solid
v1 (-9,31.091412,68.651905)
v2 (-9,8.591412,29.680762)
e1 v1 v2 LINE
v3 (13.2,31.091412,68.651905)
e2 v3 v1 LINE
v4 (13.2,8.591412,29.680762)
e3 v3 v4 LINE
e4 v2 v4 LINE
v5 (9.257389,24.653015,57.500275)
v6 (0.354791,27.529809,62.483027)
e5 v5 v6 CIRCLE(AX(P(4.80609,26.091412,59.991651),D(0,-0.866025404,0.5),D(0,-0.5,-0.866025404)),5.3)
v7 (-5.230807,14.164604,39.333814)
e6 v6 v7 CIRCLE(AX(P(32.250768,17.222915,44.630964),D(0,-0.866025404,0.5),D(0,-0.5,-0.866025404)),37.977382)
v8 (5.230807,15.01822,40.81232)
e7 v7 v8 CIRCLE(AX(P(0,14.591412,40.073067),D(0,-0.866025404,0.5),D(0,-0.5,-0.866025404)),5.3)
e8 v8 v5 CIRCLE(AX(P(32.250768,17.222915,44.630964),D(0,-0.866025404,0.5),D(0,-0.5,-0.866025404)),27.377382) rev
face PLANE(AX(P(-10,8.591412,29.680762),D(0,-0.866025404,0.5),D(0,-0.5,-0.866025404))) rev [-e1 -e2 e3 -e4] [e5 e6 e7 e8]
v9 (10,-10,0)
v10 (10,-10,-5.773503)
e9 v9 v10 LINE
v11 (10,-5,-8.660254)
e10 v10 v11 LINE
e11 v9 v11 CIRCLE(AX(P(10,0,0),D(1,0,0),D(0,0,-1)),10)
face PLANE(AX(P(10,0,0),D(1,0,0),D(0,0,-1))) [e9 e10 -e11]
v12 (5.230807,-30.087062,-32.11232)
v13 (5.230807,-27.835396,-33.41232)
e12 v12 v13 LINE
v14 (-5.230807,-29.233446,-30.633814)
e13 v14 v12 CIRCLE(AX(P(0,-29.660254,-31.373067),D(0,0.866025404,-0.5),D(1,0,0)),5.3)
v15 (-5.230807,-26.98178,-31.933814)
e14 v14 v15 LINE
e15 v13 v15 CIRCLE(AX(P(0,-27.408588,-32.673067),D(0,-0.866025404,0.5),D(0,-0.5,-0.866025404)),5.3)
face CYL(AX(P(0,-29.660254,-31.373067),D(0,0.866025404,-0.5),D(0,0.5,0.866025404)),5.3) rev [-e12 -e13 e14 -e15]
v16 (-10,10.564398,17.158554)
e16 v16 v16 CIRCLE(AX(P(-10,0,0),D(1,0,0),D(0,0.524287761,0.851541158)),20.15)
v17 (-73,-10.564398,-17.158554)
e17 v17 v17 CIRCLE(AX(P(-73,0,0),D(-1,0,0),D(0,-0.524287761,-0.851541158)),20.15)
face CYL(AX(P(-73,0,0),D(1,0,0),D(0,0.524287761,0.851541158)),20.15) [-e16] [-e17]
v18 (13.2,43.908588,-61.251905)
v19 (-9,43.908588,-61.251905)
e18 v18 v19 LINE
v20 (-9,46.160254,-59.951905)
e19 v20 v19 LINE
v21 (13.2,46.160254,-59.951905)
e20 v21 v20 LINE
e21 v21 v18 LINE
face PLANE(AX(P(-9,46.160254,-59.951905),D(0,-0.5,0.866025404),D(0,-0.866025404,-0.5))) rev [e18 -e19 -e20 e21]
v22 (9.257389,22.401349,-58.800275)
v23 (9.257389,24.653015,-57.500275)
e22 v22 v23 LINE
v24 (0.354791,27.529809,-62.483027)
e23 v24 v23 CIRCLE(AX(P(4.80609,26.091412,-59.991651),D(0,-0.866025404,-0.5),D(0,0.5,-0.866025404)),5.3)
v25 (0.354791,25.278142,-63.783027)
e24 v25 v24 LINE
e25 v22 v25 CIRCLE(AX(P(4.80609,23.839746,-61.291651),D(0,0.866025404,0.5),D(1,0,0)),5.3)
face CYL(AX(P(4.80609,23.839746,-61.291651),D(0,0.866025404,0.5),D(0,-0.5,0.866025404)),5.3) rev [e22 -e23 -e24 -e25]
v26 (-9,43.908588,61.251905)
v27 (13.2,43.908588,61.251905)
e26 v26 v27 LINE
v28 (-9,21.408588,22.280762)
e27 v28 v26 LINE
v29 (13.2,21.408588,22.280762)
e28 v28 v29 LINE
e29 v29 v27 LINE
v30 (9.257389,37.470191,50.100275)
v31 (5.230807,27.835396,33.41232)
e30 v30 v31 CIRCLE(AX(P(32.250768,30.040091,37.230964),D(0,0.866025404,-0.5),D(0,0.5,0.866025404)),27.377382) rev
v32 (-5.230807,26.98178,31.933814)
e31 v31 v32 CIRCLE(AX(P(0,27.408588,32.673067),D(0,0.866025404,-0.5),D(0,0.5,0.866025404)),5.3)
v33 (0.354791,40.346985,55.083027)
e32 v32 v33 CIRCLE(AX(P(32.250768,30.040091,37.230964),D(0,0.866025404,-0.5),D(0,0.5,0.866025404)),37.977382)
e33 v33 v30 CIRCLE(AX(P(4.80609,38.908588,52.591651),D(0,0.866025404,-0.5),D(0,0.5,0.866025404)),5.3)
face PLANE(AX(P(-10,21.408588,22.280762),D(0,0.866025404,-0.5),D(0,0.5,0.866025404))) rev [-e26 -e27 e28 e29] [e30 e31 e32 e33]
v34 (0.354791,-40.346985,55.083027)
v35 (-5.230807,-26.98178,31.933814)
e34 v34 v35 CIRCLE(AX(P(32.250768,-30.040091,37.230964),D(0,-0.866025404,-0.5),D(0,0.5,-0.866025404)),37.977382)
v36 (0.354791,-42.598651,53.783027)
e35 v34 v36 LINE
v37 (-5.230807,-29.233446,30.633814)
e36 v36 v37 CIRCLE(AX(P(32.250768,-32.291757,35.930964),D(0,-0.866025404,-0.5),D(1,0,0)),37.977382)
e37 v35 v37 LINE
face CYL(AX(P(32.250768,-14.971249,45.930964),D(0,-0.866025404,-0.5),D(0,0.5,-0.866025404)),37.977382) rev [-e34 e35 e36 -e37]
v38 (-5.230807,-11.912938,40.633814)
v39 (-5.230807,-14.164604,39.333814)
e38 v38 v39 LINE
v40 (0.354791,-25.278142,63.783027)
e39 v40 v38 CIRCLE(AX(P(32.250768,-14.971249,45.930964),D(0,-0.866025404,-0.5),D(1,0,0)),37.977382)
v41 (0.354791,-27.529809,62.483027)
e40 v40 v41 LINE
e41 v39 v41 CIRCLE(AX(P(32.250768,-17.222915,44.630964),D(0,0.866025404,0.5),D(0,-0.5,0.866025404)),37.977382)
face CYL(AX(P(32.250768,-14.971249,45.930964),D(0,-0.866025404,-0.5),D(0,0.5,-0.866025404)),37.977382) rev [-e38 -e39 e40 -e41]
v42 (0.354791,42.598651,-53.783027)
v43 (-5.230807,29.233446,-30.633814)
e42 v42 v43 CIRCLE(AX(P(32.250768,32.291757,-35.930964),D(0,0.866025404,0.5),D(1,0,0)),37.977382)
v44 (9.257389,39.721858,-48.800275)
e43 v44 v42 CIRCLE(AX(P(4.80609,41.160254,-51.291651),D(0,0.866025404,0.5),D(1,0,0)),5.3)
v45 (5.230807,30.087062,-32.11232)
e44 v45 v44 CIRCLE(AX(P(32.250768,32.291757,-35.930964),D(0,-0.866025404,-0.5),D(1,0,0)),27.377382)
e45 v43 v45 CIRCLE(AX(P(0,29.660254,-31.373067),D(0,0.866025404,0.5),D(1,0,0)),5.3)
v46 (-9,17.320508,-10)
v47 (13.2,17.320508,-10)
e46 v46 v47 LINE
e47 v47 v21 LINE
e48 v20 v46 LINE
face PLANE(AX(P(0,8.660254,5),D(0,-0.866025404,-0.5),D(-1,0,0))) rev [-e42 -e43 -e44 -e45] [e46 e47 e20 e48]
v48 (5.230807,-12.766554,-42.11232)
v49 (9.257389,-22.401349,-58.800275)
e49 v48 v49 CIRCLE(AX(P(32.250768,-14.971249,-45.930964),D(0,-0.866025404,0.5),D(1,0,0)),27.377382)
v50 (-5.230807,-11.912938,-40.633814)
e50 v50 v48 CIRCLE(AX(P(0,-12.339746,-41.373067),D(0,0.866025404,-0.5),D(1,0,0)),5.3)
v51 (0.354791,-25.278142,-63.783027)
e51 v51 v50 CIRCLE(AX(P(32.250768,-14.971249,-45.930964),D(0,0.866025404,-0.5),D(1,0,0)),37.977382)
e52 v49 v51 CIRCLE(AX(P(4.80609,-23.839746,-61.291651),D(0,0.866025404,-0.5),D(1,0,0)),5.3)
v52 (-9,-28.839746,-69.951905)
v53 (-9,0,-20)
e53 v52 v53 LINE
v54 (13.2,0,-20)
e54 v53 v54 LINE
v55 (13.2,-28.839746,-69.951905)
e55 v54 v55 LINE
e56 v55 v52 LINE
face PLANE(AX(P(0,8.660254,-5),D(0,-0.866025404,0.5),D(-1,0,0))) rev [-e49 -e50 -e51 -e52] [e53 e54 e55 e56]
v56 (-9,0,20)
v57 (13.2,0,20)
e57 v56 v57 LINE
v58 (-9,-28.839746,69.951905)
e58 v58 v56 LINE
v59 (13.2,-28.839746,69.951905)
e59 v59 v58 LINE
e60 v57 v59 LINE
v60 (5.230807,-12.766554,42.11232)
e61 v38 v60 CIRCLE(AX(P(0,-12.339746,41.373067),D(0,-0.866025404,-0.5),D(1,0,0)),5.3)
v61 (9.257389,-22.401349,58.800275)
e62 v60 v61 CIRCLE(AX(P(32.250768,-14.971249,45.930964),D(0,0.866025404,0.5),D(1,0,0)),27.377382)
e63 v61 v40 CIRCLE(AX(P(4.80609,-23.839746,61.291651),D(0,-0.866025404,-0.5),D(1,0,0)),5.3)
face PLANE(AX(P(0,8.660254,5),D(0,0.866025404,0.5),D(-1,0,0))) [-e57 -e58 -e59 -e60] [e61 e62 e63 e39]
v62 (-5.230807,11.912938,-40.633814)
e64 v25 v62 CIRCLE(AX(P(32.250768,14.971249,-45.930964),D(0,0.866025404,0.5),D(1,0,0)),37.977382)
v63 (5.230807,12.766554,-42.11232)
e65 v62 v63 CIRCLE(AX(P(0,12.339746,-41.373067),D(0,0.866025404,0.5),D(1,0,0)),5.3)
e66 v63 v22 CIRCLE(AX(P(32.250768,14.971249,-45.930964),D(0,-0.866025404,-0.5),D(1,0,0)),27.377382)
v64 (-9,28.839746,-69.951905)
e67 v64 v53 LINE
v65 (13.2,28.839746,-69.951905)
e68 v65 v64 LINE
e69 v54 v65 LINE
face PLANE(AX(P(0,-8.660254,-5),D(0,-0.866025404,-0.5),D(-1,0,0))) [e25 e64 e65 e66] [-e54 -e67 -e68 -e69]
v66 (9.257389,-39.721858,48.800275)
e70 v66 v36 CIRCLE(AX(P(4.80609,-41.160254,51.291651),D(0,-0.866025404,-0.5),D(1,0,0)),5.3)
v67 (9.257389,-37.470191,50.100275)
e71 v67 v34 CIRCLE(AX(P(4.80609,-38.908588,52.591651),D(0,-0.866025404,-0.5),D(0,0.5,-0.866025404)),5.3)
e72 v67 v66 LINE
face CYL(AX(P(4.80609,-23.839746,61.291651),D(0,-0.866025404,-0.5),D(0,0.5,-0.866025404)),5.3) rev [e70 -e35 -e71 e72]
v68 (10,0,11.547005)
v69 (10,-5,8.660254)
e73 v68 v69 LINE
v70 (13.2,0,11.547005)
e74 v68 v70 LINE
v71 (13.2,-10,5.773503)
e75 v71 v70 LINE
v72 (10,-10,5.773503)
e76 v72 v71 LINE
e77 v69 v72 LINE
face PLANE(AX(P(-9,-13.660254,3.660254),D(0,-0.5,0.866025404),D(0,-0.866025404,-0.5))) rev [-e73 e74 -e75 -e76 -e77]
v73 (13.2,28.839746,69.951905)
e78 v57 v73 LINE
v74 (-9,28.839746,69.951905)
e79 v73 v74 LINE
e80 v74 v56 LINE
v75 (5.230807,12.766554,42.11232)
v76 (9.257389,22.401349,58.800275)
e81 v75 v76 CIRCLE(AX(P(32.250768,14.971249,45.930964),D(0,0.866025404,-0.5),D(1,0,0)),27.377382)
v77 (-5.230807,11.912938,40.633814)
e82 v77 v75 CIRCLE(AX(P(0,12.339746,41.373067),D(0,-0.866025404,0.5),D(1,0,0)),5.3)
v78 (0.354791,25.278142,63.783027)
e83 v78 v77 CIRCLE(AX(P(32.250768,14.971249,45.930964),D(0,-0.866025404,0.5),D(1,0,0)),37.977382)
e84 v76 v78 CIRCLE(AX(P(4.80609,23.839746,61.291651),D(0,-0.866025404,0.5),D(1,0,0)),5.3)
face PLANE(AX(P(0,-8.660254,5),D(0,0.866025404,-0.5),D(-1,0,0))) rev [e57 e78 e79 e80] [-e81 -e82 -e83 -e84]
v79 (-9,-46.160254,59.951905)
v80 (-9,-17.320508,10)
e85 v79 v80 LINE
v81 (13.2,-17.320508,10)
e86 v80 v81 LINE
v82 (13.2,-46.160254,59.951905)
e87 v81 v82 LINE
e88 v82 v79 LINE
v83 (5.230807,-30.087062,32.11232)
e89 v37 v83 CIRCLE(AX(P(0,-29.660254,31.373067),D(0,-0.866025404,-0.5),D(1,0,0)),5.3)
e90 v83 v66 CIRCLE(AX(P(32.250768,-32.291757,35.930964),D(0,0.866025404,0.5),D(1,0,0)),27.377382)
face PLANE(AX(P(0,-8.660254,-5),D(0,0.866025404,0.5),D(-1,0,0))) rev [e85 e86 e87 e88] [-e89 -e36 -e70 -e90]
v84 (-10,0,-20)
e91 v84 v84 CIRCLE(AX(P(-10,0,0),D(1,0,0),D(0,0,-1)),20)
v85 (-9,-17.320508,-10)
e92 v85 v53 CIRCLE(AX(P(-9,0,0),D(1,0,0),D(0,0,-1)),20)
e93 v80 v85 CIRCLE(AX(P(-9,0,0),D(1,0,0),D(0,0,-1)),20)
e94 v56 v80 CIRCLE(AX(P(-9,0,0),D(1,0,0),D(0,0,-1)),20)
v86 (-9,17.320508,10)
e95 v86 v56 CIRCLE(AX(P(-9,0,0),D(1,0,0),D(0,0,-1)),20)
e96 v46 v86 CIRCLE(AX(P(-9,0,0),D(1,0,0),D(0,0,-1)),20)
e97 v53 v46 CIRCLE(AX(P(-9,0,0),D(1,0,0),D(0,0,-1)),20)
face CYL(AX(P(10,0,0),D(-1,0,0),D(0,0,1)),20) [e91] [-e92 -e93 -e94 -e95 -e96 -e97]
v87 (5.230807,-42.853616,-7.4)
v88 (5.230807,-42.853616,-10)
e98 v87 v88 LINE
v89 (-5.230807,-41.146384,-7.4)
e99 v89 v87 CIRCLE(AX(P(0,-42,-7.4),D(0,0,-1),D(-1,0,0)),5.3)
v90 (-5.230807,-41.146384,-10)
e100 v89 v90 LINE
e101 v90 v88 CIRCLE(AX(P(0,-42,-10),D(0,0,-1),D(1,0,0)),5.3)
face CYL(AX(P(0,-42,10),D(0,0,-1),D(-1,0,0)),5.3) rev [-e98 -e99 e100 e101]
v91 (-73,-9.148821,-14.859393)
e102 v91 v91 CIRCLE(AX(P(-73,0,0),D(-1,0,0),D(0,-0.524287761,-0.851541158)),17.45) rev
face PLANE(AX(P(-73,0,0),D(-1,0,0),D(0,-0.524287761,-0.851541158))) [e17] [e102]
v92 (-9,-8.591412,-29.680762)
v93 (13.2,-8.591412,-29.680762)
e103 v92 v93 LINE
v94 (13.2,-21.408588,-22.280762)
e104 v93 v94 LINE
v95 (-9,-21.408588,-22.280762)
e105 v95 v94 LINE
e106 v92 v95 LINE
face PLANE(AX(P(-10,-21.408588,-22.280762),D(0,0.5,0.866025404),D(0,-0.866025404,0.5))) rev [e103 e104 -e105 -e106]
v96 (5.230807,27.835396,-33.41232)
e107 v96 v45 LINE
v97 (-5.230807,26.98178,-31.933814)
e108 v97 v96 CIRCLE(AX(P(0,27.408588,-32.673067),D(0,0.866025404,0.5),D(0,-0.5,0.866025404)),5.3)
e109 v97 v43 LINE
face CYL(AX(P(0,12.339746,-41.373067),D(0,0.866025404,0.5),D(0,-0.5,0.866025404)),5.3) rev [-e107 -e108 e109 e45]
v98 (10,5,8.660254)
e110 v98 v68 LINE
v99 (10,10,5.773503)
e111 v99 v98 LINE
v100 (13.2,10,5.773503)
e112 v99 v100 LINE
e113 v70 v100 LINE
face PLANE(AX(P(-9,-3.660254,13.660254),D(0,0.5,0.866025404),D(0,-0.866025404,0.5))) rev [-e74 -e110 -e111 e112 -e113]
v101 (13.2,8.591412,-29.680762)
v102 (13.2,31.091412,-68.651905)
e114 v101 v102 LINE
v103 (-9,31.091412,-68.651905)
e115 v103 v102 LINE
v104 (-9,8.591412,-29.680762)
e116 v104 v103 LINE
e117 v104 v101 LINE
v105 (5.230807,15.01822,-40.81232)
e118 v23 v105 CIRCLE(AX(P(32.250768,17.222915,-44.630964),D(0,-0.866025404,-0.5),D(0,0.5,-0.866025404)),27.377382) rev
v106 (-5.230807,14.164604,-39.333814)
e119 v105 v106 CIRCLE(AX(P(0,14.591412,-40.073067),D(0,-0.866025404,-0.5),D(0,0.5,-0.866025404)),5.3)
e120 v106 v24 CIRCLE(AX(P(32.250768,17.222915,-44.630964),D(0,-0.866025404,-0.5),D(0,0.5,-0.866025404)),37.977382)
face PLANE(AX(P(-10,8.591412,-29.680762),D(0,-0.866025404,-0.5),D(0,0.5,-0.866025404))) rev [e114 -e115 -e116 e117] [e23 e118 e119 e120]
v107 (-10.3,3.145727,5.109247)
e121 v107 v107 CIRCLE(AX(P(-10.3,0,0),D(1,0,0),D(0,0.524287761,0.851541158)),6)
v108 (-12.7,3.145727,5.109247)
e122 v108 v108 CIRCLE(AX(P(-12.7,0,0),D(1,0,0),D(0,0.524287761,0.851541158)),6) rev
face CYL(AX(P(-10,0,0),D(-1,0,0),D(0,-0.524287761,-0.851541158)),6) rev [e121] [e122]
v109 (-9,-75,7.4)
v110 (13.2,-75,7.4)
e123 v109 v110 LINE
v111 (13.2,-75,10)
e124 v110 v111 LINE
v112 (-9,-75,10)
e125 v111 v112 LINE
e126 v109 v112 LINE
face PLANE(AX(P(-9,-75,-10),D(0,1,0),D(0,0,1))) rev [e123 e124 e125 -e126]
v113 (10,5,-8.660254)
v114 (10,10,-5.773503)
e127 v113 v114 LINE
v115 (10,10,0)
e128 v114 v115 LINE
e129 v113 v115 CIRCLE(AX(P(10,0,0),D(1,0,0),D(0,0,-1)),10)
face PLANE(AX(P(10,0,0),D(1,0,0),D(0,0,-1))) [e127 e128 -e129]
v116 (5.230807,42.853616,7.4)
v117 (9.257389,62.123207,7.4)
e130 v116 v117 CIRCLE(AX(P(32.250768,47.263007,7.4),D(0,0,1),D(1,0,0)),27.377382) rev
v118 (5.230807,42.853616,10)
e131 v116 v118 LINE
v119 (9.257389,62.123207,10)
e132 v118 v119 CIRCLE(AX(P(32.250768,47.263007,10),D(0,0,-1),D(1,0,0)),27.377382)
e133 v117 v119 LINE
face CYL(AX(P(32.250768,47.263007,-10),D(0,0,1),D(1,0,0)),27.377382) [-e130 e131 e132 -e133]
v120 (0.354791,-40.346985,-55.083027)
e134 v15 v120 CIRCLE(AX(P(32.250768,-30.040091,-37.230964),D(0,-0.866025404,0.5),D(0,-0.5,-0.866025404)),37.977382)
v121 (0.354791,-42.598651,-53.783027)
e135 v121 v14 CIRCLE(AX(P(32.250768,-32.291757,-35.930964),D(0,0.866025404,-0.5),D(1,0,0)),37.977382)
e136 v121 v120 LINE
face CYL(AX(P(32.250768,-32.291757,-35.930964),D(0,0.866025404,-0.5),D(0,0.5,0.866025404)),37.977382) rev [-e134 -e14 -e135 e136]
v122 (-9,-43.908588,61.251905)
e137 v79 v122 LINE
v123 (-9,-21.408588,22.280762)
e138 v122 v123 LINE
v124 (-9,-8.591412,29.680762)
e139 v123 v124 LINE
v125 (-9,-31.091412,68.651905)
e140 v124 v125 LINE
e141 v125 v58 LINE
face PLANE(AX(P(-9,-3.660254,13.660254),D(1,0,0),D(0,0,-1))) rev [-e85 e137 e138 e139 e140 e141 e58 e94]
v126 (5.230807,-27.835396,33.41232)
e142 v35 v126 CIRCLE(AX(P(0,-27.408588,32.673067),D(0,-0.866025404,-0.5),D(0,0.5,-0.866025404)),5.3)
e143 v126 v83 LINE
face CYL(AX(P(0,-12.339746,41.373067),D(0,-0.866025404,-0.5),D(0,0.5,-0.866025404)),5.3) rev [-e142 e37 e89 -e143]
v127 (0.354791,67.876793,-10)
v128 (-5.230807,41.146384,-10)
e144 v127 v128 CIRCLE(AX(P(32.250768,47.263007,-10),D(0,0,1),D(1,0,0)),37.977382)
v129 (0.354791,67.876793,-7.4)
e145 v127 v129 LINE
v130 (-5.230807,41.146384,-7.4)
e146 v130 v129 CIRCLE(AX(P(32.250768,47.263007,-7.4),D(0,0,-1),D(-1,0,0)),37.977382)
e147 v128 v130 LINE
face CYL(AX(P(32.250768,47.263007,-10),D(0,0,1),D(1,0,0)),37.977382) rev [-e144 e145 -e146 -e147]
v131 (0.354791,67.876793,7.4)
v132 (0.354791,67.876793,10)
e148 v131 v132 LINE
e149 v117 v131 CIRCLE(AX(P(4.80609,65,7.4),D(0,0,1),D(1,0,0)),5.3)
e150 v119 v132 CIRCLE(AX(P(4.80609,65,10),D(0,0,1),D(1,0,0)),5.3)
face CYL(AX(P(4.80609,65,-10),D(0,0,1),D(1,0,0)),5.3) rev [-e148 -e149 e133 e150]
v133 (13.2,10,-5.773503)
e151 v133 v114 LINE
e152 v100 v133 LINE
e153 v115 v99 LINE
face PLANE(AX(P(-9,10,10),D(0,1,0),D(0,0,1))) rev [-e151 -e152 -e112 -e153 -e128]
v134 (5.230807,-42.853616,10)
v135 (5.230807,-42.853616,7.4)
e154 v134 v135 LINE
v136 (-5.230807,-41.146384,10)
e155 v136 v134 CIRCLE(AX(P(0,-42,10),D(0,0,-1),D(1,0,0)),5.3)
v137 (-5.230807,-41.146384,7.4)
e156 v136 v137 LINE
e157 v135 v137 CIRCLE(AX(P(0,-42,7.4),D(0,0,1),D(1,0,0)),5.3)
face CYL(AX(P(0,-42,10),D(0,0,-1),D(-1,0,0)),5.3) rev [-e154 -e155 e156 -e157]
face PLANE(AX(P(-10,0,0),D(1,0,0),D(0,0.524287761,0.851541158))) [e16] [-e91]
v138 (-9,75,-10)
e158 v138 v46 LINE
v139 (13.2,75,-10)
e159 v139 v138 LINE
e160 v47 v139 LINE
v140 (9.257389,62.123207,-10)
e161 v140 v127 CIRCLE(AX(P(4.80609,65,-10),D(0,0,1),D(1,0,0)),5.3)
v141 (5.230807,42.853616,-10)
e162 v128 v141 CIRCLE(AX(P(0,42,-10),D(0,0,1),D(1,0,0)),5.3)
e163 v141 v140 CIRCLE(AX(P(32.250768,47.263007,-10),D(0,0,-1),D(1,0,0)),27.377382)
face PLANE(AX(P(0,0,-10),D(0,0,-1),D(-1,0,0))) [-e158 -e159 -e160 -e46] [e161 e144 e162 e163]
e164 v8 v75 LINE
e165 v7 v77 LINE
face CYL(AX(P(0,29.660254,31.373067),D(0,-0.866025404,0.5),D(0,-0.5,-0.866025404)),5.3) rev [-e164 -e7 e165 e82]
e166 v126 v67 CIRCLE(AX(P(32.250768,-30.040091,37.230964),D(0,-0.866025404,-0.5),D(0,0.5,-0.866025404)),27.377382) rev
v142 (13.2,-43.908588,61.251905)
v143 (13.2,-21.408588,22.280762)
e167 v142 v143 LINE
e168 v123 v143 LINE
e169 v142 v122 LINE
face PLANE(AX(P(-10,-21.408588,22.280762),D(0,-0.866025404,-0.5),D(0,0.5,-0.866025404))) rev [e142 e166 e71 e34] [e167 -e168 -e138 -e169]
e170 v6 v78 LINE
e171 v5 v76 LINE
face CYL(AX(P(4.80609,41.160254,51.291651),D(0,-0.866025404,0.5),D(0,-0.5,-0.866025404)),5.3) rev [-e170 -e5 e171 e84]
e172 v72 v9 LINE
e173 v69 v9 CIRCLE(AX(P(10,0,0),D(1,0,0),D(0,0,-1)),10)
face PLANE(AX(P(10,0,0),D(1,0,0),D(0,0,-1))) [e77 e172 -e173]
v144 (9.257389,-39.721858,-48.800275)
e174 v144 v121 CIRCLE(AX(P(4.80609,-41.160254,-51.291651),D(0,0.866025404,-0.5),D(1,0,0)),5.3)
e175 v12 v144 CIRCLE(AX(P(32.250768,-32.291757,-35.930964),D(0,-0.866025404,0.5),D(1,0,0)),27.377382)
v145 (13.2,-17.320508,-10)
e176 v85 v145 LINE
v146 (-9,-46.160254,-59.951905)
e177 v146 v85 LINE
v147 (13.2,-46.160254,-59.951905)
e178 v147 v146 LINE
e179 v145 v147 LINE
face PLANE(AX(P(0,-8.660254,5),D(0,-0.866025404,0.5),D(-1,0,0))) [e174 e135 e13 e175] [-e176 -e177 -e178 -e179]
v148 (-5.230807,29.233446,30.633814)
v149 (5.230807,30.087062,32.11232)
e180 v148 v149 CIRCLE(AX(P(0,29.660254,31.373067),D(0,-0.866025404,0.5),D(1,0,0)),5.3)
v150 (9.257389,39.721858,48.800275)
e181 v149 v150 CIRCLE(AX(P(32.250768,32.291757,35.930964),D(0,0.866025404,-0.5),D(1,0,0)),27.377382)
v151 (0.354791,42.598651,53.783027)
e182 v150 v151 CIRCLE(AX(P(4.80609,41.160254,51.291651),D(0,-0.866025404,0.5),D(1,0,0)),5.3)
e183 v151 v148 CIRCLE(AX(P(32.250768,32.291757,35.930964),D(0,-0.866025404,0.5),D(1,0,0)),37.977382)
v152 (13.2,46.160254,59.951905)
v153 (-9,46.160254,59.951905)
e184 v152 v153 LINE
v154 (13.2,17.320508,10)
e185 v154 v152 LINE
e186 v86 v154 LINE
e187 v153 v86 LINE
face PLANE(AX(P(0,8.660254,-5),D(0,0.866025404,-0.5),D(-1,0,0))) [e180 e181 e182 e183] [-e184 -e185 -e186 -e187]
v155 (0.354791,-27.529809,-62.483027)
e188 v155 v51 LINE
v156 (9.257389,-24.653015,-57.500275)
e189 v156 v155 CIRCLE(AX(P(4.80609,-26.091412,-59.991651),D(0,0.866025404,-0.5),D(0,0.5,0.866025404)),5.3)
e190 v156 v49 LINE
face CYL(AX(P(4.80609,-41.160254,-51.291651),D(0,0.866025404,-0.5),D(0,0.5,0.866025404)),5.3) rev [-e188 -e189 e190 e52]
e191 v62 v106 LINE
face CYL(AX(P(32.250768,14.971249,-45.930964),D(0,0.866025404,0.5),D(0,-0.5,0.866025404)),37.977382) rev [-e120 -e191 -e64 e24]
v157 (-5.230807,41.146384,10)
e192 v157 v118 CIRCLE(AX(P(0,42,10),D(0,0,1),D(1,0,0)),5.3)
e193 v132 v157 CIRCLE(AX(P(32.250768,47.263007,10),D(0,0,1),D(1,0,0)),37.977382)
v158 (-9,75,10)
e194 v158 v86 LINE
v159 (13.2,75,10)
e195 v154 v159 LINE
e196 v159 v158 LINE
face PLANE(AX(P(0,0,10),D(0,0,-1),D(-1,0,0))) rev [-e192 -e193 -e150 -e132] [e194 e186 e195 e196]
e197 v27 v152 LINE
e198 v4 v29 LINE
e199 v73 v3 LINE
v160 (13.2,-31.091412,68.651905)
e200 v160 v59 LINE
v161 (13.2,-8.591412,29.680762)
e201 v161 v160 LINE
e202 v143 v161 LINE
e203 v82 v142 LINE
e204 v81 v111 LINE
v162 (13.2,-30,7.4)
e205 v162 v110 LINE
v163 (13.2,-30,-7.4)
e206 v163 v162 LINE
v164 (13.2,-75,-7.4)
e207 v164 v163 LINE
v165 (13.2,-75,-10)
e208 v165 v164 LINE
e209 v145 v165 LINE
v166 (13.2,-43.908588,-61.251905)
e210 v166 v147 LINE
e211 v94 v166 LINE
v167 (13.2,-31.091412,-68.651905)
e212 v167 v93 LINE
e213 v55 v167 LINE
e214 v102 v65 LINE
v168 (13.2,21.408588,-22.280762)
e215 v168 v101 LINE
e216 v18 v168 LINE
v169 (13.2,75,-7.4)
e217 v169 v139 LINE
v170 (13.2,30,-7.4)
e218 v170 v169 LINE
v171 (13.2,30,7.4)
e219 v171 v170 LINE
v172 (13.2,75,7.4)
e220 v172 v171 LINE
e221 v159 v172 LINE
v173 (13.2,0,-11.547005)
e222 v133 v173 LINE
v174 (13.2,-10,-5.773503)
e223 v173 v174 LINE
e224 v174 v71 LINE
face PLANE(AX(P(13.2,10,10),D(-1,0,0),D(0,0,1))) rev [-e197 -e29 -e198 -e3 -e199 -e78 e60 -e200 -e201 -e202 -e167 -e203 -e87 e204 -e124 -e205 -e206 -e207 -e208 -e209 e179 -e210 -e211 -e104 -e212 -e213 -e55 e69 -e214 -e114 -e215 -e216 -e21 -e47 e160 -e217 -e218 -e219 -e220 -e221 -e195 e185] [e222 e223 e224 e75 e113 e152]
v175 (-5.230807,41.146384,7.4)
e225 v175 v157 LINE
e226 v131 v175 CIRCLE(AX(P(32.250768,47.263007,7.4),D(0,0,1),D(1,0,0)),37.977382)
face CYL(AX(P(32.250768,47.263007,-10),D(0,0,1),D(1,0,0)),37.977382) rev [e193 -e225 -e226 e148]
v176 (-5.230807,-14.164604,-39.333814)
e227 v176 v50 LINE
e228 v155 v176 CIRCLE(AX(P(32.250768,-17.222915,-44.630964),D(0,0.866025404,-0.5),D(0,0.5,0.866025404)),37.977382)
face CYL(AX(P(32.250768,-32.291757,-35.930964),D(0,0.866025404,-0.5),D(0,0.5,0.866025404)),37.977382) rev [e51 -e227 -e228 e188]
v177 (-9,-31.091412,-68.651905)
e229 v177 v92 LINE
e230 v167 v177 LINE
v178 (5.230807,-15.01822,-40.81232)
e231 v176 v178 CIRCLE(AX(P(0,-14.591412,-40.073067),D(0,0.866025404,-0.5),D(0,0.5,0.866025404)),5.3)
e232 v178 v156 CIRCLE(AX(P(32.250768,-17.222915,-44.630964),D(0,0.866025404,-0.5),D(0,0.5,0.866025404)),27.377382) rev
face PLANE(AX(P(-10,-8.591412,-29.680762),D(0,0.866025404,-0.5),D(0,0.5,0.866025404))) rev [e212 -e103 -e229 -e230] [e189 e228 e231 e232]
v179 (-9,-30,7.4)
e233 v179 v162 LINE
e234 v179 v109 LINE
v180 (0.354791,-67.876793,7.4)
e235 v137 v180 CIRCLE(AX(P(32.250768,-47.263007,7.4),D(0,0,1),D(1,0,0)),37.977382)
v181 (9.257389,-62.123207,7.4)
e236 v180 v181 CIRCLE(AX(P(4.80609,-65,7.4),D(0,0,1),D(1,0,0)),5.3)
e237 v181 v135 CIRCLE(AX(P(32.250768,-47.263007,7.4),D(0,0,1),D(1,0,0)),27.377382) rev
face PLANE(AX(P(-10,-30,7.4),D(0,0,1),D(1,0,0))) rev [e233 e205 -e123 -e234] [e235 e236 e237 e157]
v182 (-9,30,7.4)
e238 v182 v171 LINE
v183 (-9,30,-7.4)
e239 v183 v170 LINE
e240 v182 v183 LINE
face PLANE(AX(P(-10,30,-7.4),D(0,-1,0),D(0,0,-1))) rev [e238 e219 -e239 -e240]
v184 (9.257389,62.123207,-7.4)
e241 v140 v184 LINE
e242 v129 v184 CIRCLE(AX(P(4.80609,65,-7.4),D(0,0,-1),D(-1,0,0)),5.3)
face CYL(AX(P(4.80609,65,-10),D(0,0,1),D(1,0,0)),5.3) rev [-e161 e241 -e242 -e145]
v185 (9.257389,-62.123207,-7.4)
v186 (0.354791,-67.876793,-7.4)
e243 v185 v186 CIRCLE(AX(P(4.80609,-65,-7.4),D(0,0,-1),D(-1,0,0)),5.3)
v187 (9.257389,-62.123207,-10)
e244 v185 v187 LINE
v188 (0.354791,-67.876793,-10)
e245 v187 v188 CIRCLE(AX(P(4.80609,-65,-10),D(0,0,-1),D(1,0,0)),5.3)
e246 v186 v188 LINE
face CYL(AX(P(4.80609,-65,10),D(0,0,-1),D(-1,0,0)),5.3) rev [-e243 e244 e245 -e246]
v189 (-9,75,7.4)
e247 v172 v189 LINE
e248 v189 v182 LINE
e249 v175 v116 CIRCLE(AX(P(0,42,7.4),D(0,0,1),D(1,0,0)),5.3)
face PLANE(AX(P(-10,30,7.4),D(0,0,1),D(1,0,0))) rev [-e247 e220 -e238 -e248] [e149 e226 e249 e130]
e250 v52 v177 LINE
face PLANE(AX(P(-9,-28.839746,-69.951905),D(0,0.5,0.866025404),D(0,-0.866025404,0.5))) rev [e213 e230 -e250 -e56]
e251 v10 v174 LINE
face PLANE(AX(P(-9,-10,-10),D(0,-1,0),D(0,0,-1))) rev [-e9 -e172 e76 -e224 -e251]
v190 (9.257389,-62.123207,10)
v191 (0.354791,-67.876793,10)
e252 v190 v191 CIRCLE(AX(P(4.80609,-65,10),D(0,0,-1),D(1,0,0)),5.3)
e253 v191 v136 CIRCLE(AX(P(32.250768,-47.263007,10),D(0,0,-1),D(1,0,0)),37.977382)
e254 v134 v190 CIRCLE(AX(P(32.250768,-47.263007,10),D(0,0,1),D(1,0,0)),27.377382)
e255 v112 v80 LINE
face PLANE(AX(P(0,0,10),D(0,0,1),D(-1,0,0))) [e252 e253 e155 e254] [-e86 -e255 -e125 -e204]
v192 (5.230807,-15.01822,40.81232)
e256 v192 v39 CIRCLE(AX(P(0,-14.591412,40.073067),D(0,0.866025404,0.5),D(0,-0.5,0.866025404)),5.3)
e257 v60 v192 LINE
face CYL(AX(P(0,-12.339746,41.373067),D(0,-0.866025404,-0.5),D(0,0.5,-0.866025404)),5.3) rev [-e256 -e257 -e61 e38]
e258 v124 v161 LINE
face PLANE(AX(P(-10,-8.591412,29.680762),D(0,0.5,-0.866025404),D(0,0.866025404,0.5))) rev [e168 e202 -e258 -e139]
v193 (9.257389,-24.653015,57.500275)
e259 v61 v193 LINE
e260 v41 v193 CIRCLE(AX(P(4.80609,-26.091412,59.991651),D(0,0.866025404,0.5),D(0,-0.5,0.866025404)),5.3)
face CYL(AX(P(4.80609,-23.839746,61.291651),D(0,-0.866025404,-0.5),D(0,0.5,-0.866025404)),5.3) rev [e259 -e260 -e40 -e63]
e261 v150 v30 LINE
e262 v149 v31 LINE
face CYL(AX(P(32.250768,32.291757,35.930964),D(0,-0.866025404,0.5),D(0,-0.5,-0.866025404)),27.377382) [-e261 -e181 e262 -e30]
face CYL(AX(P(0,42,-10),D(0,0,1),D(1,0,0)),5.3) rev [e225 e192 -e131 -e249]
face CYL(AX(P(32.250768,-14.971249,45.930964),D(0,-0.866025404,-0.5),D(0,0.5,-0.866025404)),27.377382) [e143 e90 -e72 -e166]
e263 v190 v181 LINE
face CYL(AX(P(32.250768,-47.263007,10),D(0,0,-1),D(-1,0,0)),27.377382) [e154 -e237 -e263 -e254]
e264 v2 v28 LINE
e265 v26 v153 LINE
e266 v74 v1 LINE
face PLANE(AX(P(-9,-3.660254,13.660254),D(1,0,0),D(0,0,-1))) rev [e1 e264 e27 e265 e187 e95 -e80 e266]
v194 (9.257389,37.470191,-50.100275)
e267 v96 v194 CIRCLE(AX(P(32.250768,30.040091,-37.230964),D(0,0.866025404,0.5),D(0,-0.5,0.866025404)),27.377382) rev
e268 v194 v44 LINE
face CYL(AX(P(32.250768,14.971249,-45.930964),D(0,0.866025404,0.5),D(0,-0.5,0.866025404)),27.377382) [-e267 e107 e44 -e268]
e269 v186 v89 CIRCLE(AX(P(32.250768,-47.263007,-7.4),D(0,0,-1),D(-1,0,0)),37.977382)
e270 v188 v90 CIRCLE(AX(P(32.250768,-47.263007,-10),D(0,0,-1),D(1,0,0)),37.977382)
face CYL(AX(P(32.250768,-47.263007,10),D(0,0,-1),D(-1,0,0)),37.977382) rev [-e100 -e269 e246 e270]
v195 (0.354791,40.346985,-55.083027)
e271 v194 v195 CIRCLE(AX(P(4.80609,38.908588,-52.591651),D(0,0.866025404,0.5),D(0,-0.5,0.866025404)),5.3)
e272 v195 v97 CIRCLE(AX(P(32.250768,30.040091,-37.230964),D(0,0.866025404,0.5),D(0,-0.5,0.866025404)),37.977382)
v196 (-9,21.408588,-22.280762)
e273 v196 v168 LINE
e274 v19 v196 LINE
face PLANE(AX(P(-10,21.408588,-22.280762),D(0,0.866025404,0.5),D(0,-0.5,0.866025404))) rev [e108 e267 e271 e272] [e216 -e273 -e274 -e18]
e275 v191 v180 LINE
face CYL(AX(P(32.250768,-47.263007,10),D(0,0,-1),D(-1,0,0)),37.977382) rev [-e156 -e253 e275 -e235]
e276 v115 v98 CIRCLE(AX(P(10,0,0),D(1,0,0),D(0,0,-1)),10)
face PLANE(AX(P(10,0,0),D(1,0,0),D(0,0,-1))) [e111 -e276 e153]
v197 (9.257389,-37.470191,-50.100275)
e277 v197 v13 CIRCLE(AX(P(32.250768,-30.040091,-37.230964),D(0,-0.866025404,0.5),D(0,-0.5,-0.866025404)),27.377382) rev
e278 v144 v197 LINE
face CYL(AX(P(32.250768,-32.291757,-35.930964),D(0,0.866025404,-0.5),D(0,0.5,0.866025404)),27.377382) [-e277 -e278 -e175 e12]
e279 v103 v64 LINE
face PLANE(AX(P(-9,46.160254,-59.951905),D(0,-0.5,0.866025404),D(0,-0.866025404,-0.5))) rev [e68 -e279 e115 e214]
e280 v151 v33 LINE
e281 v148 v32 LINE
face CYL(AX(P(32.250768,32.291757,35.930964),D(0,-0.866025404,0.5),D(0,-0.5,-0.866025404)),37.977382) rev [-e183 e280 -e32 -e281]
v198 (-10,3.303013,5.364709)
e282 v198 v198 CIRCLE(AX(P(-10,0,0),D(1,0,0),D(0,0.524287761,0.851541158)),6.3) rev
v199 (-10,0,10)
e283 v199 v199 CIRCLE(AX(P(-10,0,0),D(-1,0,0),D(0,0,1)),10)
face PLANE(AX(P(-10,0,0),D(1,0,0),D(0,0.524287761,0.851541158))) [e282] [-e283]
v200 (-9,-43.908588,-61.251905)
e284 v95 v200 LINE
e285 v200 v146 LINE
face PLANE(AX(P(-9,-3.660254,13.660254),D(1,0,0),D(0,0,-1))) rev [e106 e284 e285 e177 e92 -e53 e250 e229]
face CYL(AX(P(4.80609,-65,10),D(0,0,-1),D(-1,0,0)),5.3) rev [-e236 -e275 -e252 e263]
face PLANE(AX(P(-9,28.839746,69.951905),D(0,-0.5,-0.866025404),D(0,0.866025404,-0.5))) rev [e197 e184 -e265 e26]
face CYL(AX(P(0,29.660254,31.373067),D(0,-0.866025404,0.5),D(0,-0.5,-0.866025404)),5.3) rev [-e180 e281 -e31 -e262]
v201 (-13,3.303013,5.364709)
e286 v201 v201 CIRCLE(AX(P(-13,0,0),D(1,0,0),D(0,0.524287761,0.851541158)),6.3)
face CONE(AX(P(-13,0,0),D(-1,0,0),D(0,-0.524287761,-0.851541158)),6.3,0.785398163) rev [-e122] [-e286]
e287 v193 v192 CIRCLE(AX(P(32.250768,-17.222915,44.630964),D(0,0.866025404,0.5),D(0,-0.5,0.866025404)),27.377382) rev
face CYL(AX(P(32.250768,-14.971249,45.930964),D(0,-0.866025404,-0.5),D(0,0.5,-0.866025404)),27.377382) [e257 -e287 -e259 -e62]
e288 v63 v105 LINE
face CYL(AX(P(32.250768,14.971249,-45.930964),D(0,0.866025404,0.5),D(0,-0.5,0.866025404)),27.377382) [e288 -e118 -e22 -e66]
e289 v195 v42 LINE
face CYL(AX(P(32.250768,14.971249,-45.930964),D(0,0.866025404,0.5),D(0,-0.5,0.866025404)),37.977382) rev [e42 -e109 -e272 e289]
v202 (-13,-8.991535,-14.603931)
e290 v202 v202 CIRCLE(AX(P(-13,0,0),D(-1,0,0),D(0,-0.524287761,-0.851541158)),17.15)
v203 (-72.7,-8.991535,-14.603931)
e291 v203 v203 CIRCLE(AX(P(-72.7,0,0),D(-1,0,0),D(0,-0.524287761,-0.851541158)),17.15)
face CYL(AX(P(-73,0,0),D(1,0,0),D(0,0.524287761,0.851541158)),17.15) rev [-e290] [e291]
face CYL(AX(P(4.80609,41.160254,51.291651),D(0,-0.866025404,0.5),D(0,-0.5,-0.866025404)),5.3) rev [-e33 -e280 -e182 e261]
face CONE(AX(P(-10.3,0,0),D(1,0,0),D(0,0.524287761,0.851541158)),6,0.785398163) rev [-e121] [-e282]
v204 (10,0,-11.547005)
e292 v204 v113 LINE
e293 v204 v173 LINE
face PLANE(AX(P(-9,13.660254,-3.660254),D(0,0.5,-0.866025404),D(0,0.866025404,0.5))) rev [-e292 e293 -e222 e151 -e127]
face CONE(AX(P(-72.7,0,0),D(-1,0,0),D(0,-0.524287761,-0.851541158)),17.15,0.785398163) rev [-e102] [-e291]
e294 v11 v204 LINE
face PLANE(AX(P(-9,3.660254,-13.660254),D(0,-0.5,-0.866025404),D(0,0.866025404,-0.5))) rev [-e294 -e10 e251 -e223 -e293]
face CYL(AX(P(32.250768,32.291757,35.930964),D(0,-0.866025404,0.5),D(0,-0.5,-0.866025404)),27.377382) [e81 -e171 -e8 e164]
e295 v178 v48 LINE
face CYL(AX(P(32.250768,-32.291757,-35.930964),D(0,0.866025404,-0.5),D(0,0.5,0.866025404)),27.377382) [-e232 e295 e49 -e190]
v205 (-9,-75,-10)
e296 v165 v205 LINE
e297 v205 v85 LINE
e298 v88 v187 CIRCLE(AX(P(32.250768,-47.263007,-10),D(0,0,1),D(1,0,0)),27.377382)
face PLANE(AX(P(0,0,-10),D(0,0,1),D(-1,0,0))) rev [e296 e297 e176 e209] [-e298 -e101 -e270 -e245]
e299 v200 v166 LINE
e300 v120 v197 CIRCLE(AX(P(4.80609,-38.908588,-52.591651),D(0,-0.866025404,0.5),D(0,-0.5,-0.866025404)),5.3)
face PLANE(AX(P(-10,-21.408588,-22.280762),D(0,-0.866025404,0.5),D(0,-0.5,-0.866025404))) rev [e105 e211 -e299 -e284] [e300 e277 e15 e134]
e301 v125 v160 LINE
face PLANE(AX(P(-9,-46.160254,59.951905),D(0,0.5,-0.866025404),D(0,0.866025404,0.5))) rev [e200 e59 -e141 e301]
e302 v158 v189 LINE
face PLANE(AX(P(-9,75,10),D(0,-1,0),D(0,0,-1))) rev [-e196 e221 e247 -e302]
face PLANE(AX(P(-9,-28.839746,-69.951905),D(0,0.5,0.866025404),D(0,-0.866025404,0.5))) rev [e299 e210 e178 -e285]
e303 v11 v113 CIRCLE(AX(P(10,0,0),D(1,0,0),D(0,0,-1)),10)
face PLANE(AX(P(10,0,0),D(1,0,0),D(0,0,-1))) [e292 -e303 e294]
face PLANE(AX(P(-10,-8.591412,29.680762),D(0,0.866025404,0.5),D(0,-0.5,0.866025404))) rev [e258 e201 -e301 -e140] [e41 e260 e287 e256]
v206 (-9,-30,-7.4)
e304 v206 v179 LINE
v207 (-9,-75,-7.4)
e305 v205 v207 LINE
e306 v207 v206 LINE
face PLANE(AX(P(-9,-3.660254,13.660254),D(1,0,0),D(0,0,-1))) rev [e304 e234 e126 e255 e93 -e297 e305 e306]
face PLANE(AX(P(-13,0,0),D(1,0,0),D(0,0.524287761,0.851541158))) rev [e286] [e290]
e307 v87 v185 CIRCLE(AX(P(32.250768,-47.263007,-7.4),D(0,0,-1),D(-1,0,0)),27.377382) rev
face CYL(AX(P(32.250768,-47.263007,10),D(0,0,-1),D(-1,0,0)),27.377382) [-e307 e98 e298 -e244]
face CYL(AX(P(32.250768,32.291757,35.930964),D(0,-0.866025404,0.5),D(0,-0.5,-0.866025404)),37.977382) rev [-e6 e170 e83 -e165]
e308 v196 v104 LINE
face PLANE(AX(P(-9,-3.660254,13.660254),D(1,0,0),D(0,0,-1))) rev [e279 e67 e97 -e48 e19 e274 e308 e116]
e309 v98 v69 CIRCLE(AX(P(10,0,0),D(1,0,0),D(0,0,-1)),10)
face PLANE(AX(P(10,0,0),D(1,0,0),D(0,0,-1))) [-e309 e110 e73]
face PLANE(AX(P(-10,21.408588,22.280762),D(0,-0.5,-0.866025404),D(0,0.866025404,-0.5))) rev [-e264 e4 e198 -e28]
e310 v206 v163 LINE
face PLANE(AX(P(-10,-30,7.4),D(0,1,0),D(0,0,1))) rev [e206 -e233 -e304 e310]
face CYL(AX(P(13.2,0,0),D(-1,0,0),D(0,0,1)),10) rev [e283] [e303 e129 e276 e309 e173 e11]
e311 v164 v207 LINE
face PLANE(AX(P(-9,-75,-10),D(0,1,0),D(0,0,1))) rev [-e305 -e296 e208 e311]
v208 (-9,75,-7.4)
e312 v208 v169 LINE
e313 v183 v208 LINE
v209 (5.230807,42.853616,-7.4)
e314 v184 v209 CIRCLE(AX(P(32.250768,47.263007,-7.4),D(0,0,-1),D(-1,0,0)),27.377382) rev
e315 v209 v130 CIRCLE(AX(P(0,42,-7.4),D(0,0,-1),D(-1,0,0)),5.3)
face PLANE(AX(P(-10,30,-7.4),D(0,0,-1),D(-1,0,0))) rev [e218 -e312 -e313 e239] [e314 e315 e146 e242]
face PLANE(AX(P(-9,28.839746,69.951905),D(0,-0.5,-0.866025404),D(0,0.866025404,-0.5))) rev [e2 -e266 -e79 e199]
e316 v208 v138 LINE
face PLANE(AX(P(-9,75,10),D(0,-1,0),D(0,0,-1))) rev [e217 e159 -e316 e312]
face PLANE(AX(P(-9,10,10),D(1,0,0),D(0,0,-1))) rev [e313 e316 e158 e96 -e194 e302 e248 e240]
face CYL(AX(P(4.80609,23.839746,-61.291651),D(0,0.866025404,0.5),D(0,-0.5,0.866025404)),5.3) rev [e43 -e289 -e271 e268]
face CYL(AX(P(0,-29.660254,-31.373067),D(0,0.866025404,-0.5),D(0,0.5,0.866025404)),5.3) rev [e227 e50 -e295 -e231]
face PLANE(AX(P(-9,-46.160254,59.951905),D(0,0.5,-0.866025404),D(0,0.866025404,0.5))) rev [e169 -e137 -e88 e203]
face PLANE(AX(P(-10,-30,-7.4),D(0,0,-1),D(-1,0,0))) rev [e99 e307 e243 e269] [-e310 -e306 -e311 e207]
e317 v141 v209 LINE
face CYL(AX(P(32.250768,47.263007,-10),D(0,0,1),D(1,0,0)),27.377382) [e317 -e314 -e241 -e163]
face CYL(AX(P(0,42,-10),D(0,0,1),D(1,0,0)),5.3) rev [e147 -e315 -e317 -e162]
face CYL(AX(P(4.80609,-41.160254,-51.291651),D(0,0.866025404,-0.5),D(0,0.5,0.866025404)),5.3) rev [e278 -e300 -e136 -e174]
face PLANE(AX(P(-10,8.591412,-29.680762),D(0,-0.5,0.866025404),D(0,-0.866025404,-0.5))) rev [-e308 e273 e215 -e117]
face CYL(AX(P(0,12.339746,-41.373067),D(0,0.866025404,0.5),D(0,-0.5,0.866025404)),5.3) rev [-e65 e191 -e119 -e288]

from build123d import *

# Parameters (mm, degrees)
SKETCH_1_R               = 20
EXTRUDE_1_DEPTH          = 10
SKETCH_2_W               = 22.2
SKETCH_2_H               = 65
EXTRUDE_2_DEPTH          = 10
SKETCH_6_W               = 14.8
SKETCH_6_H               = 90
F_14_8MM_DEPTH           = 79.735252587
CUT_EXTRUDE_2_DEPTH      = 10
PATTERN_CIRCULAR_1_COUNT = 6
CUT_EXTRUDE_3_DEPTH      = 104.404589129
CUT_EXTRUDE_3_DEPTH_BACK = 104.404589129
SKETCH_5_R               = 10


# Read off the part's stored shape, not the designer's step: the combine step
with BuildPart() as part:
    # Sketch 1 → Extrude 1 (new, symmetric)
    with BuildSketch(Plane(origin=(0, 0, 0), x_dir=(0, 0, -1), z_dir=(1, 0, 0))):
        Circle(SKETCH_1_R)
    extrude(amount=EXTRUDE_1_DEPTH, both=True)

    # Sketch 2 → Extrude 2 (add, symmetric)
    with BuildSketch(Plane.XY):
        with Locations((2.1, 42.5)):
            Rectangle(SKETCH_2_W, SKETCH_2_H)
    extrude_2 = extrude(amount=EXTRUDE_2_DEPTH, both=True)

    # Sketch 6 → 14.8mm (cut, symmetric)
    with BuildSketch(Plane(origin=(0, 0, 0), x_dir=(0, 0, -1), z_dir=(1, 0, 0))):
        with Locations((0, 75)):
            Rectangle(SKETCH_6_W, SKETCH_6_H)
    f_14_8mm = extrude(amount=F_14_8MM_DEPTH, both=True, mode=Mode.SUBTRACT)

    # Sketch 4 → Cut-Extrude 2 (cut, symmetric)
    with BuildSketch(Plane.XY):
        with BuildLine():
            ThreePointArc((0.354791324, 67.87679305), (-4.923683601, 55.030996482), (-5.230806803, 41.146384051))
            ThreePointArc((-5.230806803, 41.146384051), (0.853615949, 36.769193197), (5.230806803, 42.853615949))
            ThreePointArc((5.230806803, 42.853615949), (5.452207774, 52.862845615), (9.257389091, 62.12320695))
            ThreePointArc((9.257389091, 62.12320695), (7.682883257, 69.451298883), (0.354791324, 67.87679305))
        make_face()
    cut_extrude_2 = extrude(amount=CUT_EXTRUDE_2_DEPTH, both=True, mode=Mode.SUBTRACT)

    # Pattern Circular 1: Extrude 2, 14.8mm, Cut-Extrude 2 ×6 about axis
    pattern_circular_1_axis = Axis((0, 0, 0), (1, 0, 0))
    add([extrude_2.rotate(pattern_circular_1_axis, i * 360 / PATTERN_CIRCULAR_1_COUNT) for i in range(1, PATTERN_CIRCULAR_1_COUNT)])
    add([f_14_8mm.rotate(pattern_circular_1_axis, i * 360 / PATTERN_CIRCULAR_1_COUNT) for i in range(1, PATTERN_CIRCULAR_1_COUNT)], mode=Mode.SUBTRACT)
    add([cut_extrude_2.rotate(pattern_circular_1_axis, i * 360 / PATTERN_CIRCULAR_1_COUNT) for i in range(1, PATTERN_CIRCULAR_1_COUNT)], mode=Mode.SUBTRACT)

    # Sketch 5 → Cut-Extrude 3 (cut, two sides: drawn at the far end of the back side and taken through both)
    with BuildSketch(Plane.ZY.offset(-CUT_EXTRUDE_3_DEPTH_BACK)):
        Circle(SKETCH_5_R)
    extrude(amount=CUT_EXTRUDE_3_DEPTH + CUT_EXTRUDE_3_DEPTH_BACK, mode=Mode.SUBTRACT)

    # Combine 3_4 outline → Combine 3_4 (revolve)
    with BuildSketch(Plane.YX):
        Polygon((6.3, -10), (6, -10.3), (6, -12.7), (6.3, -13), (17.15, -13), (17.15, -72.7), (17.45, -73), (20.15, -73), (20.15, -10), align=None)
    revolve(axis=Axis((0, 0, 0), (1, 0, 0)))


solid = part.part
